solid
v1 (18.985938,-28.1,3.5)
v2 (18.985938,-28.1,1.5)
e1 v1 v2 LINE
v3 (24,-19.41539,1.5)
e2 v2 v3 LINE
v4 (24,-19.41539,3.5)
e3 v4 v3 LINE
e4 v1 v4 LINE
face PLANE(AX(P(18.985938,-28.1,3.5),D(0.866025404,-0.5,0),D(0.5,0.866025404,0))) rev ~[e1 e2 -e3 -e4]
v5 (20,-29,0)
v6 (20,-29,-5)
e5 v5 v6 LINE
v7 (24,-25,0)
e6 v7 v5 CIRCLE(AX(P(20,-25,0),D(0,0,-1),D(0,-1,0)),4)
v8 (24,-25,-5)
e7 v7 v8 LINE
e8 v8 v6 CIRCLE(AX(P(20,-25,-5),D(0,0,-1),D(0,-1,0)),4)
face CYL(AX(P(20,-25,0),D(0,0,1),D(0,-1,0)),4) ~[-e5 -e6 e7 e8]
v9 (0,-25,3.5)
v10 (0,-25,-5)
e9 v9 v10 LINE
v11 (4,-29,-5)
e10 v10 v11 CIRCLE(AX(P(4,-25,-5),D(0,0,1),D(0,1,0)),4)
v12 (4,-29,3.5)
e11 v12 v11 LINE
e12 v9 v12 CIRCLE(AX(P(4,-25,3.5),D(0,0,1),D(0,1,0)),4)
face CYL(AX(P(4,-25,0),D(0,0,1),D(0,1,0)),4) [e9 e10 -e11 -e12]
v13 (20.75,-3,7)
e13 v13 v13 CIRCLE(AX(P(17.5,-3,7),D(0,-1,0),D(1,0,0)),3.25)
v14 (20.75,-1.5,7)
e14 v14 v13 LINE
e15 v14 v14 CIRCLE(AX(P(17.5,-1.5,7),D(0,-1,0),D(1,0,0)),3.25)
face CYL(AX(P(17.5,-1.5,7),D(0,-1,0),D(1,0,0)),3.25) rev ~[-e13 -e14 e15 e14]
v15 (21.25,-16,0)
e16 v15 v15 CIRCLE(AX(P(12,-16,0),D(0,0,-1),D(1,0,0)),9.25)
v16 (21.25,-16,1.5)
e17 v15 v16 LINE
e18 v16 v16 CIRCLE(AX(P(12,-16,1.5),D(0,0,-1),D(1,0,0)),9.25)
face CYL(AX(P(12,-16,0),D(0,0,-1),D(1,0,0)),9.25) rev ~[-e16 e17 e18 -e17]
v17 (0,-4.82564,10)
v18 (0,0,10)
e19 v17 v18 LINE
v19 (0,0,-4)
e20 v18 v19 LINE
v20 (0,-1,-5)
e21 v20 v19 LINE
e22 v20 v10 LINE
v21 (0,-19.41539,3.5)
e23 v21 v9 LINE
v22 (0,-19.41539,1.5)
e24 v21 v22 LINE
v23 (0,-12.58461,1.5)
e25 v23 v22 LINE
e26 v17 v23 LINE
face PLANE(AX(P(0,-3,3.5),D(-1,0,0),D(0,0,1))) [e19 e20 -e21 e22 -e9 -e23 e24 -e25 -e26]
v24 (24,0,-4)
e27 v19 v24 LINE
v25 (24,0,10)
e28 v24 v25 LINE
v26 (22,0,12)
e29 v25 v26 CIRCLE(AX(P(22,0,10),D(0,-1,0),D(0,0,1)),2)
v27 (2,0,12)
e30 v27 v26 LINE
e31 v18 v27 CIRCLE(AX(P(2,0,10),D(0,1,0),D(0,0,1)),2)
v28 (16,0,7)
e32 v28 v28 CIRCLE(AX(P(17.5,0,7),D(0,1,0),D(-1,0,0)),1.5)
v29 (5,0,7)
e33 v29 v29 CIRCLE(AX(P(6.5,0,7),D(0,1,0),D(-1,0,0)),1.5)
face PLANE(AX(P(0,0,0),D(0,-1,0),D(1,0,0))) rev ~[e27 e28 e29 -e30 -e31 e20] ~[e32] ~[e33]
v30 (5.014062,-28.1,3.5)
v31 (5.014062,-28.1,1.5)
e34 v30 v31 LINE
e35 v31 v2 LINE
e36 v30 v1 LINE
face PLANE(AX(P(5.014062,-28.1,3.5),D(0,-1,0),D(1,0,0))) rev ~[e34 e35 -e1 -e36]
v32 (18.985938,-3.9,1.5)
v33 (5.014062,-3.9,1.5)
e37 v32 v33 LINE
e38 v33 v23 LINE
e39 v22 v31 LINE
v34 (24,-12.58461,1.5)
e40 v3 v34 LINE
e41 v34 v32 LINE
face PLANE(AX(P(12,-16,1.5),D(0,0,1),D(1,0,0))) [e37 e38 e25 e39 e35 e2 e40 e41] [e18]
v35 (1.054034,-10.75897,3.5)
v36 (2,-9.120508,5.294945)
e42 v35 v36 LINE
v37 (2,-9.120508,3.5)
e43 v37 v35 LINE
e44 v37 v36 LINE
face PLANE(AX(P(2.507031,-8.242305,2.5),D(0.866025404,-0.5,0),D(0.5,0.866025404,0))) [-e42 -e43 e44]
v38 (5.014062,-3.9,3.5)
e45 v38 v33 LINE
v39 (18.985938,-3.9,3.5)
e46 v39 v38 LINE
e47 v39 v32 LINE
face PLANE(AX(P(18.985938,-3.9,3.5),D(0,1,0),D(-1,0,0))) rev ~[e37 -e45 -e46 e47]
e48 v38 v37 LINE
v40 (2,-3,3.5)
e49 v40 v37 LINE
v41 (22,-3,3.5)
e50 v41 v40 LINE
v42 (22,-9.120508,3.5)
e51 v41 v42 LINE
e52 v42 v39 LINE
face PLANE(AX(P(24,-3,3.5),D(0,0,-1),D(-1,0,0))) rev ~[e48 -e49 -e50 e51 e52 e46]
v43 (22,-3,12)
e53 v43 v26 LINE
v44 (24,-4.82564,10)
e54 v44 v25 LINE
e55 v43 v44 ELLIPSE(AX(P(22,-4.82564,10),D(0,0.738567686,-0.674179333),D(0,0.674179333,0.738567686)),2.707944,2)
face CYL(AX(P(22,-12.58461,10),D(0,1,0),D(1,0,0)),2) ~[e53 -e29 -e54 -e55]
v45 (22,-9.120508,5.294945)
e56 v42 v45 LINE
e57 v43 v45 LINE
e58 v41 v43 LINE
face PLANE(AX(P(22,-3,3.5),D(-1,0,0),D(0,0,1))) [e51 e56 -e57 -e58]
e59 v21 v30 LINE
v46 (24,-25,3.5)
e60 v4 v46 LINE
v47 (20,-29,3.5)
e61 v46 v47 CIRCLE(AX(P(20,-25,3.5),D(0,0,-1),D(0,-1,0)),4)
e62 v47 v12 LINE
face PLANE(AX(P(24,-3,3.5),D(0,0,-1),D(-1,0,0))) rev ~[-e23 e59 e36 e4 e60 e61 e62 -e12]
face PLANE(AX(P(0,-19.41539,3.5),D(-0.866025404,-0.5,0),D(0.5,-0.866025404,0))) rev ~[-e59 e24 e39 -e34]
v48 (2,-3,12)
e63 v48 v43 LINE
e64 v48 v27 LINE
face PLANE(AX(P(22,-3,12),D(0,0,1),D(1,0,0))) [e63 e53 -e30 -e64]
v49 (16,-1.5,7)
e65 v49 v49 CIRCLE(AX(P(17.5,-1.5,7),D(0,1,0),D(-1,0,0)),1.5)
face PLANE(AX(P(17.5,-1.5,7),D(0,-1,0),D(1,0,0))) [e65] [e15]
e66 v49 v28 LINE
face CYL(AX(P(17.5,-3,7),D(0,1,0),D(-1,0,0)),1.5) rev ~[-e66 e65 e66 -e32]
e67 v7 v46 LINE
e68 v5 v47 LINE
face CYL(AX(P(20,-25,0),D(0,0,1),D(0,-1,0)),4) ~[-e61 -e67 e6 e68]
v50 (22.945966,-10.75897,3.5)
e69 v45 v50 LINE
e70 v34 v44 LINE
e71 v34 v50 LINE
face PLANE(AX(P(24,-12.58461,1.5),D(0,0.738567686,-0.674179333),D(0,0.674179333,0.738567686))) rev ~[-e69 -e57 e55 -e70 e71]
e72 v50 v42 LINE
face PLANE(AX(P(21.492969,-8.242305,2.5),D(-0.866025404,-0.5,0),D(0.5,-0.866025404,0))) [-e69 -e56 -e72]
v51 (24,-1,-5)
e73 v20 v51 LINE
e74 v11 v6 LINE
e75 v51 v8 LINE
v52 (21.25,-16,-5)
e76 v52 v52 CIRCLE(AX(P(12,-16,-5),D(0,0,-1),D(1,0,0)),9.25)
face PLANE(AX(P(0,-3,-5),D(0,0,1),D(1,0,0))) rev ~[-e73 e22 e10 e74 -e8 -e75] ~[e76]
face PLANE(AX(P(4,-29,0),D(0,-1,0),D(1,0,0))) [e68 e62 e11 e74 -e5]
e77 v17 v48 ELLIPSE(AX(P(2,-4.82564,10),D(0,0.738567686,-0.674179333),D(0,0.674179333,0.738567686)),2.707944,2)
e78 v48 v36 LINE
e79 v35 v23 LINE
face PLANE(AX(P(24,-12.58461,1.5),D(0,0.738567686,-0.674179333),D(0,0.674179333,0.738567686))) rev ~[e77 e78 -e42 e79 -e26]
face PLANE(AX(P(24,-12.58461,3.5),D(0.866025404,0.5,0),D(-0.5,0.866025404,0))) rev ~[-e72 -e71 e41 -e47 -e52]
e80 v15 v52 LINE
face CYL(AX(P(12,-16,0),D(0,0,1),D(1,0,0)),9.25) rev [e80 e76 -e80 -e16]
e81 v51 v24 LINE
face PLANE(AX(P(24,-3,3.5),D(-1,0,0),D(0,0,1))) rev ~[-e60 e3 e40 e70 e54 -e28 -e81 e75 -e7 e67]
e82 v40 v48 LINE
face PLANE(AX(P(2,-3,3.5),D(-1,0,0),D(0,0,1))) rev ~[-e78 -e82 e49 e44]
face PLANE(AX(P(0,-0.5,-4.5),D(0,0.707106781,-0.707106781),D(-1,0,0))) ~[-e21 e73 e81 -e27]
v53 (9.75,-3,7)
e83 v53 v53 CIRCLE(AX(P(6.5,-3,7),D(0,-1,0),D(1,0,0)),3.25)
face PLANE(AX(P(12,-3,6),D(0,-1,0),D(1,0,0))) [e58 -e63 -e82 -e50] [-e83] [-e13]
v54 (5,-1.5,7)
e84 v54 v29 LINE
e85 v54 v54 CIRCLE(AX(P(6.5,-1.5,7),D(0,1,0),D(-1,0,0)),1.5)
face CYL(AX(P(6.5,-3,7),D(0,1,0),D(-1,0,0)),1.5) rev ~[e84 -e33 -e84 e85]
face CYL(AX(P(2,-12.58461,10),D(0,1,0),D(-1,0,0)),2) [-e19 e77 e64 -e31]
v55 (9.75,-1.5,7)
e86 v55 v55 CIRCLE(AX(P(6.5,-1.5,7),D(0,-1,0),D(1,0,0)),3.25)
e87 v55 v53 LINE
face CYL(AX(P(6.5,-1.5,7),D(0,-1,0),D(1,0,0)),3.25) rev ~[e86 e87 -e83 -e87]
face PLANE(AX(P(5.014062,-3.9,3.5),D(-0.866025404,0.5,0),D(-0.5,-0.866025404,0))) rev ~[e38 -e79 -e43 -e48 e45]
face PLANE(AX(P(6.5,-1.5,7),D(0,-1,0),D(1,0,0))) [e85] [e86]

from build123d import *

# Parameters (mm, degrees)
F0_W           = 24
F0_H           = 12
F1_DEPTH       = 3
F3_D           = 3
F3_CBORE_D     = 6.5
F3_CBORE_DEPTH = 1.5
F4_DEPTH       = 26
F7_R           = 4
F8_R           = 9.25
F9_DEPTH       = 25
F10_DEPTH      = 5
F11_DEPTH      = 2
F2_W           = 2
F2_H           = 8.5
F12_REACH      = 34.7331245983
F5_W           = 2
F5_H           = 8.5
F13_REACH      = 34.7331245983
F14_SIZE       = 1
F15_R          = 2
F17_DEPTH      = 25


# Not quite as in the source:
# - a feature names something its author has since deleted; it is built from what else it names


with BuildPart() as f1:
    # F0 (on Front) → F1 (new body)
    with BuildSketch(Plane.XZ):
        with Locations((12, 6)):
            Rectangle(F0_W, F0_H)
    extrude(amount=F1_DEPTH)

    # F3 (through all)
    with Locations(Plane.XZ.offset(3)):
        with Locations((6.5, 7), (17.5, 7)):
            CounterBoreHole(F3_D / 2, F3_CBORE_D / 2, F3_CBORE_DEPTH)

    # F2 (on face) → F4 (join)
    with BuildSketch(Plane.XZ.offset(3)):
        Polygon((0, 3.5), (0, 0), (24, 0), (24, 3.5), (22, 3.5), (2, 3.5), align=None)
    extrude(amount=F4_DEPTH)

    # F7
    f7_edges = [f1.edges().sort_by_distance(p)[0] for p in [
        (24, -29, 1.75),
        (0, -29, 1.75),
    ]]
    fillet(f7_edges, radius=F7_R)

    # F8 (on face) → F9 (cut)
    with BuildSketch(Plane(origin=(0, 0, 0), x_dir=(1, 0, 0), z_dir=(0, 0, -1))):
        with Locations((12, 16)):
            Circle(F8_R)
    extrude(amount=-F9_DEPTH, mode=Mode.SUBTRACT)

    # F10 (add): a face of the model
    f10_faces = [f1.faces().sort_by_distance(p)[0] for p in [
        (0.3764306045, -12.5, 0),
    ]]
    extrude(f10_faces, amount=F10_DEPTH)

    # F6 (on face) → F11 (cut)
    with BuildSketch(Plane.XY.offset(3.5)):
        Polygon((0, -19.4153903092), (5.0140617428, -28.1), (18.9859382572, -28.1), (24, -19.4153903092), (24, -12.5846096908), (18.9859382572, -3.9), (5.0140617428, -3.9), (0, -12.5846096908), align=None)
    extrude(amount=-F11_DEPTH, mode=Mode.SUBTRACT)

    f12_end = Plane(origin=(2.5070308714, -8.2423048454, 2.5), x_dir=(0.5, 0.8660254038, 0), z_dir=(0.8660254038, -0.5, 0))
    # F2 (on face) → F12 (join, up to a plane its end follows)
    with BuildSketch(Plane.XZ.offset(3)):
        with Locations((1, 7.75)):
            Rectangle(F2_W, F2_H)
    f12_long = extrude(amount=F12_REACH, mode=Mode.PRIVATE)
    add(split(f12_long, bisect_by=f12_end, keep=Keep.BOTTOM, mode=Mode.PRIVATE))

    f13_end = Plane(origin=(21.4929691286, -8.2423048454, 2.5), x_dir=(0.5, -0.8660254038, 0), z_dir=(-0.8660254038, -0.5, 0))
    # F5 (on face) → F13 (join, up to a plane its end follows)
    with BuildSketch(Plane.XZ.offset(3)):
        with Locations((23, 7.75)):
            Rectangle(F5_W, F5_H)
    f13_long = extrude(amount=F13_REACH, mode=Mode.PRIVATE)
    add(split(f13_long, bisect_by=f13_end, keep=Keep.BOTTOM, mode=Mode.PRIVATE))

    # F14
    f14_edges = [f1.edges().sort_by_distance(p)[0] for p in [
        (12, 0, -5),
    ]]
    chamfer(f14_edges, length=F14_SIZE)

    # F15
    f15_edges = [f1.edges().sort_by_distance(p)[0] for p in [
        (24, -6.292305, 12),
        (0, -6.292305, 12),
    ]]
    fillet(f15_edges, radius=F15_R)

    # F16 (on face) → F17 (cut)
    with BuildSketch(Plane.YZ.offset(24)):
        Polygon((-12.5846096908, 12), (-12.5846096908, 1.5), (-3, 12), align=None)
    extrude(amount=-F17_DEPTH, mode=Mode.SUBTRACT)


solid = f1.part
